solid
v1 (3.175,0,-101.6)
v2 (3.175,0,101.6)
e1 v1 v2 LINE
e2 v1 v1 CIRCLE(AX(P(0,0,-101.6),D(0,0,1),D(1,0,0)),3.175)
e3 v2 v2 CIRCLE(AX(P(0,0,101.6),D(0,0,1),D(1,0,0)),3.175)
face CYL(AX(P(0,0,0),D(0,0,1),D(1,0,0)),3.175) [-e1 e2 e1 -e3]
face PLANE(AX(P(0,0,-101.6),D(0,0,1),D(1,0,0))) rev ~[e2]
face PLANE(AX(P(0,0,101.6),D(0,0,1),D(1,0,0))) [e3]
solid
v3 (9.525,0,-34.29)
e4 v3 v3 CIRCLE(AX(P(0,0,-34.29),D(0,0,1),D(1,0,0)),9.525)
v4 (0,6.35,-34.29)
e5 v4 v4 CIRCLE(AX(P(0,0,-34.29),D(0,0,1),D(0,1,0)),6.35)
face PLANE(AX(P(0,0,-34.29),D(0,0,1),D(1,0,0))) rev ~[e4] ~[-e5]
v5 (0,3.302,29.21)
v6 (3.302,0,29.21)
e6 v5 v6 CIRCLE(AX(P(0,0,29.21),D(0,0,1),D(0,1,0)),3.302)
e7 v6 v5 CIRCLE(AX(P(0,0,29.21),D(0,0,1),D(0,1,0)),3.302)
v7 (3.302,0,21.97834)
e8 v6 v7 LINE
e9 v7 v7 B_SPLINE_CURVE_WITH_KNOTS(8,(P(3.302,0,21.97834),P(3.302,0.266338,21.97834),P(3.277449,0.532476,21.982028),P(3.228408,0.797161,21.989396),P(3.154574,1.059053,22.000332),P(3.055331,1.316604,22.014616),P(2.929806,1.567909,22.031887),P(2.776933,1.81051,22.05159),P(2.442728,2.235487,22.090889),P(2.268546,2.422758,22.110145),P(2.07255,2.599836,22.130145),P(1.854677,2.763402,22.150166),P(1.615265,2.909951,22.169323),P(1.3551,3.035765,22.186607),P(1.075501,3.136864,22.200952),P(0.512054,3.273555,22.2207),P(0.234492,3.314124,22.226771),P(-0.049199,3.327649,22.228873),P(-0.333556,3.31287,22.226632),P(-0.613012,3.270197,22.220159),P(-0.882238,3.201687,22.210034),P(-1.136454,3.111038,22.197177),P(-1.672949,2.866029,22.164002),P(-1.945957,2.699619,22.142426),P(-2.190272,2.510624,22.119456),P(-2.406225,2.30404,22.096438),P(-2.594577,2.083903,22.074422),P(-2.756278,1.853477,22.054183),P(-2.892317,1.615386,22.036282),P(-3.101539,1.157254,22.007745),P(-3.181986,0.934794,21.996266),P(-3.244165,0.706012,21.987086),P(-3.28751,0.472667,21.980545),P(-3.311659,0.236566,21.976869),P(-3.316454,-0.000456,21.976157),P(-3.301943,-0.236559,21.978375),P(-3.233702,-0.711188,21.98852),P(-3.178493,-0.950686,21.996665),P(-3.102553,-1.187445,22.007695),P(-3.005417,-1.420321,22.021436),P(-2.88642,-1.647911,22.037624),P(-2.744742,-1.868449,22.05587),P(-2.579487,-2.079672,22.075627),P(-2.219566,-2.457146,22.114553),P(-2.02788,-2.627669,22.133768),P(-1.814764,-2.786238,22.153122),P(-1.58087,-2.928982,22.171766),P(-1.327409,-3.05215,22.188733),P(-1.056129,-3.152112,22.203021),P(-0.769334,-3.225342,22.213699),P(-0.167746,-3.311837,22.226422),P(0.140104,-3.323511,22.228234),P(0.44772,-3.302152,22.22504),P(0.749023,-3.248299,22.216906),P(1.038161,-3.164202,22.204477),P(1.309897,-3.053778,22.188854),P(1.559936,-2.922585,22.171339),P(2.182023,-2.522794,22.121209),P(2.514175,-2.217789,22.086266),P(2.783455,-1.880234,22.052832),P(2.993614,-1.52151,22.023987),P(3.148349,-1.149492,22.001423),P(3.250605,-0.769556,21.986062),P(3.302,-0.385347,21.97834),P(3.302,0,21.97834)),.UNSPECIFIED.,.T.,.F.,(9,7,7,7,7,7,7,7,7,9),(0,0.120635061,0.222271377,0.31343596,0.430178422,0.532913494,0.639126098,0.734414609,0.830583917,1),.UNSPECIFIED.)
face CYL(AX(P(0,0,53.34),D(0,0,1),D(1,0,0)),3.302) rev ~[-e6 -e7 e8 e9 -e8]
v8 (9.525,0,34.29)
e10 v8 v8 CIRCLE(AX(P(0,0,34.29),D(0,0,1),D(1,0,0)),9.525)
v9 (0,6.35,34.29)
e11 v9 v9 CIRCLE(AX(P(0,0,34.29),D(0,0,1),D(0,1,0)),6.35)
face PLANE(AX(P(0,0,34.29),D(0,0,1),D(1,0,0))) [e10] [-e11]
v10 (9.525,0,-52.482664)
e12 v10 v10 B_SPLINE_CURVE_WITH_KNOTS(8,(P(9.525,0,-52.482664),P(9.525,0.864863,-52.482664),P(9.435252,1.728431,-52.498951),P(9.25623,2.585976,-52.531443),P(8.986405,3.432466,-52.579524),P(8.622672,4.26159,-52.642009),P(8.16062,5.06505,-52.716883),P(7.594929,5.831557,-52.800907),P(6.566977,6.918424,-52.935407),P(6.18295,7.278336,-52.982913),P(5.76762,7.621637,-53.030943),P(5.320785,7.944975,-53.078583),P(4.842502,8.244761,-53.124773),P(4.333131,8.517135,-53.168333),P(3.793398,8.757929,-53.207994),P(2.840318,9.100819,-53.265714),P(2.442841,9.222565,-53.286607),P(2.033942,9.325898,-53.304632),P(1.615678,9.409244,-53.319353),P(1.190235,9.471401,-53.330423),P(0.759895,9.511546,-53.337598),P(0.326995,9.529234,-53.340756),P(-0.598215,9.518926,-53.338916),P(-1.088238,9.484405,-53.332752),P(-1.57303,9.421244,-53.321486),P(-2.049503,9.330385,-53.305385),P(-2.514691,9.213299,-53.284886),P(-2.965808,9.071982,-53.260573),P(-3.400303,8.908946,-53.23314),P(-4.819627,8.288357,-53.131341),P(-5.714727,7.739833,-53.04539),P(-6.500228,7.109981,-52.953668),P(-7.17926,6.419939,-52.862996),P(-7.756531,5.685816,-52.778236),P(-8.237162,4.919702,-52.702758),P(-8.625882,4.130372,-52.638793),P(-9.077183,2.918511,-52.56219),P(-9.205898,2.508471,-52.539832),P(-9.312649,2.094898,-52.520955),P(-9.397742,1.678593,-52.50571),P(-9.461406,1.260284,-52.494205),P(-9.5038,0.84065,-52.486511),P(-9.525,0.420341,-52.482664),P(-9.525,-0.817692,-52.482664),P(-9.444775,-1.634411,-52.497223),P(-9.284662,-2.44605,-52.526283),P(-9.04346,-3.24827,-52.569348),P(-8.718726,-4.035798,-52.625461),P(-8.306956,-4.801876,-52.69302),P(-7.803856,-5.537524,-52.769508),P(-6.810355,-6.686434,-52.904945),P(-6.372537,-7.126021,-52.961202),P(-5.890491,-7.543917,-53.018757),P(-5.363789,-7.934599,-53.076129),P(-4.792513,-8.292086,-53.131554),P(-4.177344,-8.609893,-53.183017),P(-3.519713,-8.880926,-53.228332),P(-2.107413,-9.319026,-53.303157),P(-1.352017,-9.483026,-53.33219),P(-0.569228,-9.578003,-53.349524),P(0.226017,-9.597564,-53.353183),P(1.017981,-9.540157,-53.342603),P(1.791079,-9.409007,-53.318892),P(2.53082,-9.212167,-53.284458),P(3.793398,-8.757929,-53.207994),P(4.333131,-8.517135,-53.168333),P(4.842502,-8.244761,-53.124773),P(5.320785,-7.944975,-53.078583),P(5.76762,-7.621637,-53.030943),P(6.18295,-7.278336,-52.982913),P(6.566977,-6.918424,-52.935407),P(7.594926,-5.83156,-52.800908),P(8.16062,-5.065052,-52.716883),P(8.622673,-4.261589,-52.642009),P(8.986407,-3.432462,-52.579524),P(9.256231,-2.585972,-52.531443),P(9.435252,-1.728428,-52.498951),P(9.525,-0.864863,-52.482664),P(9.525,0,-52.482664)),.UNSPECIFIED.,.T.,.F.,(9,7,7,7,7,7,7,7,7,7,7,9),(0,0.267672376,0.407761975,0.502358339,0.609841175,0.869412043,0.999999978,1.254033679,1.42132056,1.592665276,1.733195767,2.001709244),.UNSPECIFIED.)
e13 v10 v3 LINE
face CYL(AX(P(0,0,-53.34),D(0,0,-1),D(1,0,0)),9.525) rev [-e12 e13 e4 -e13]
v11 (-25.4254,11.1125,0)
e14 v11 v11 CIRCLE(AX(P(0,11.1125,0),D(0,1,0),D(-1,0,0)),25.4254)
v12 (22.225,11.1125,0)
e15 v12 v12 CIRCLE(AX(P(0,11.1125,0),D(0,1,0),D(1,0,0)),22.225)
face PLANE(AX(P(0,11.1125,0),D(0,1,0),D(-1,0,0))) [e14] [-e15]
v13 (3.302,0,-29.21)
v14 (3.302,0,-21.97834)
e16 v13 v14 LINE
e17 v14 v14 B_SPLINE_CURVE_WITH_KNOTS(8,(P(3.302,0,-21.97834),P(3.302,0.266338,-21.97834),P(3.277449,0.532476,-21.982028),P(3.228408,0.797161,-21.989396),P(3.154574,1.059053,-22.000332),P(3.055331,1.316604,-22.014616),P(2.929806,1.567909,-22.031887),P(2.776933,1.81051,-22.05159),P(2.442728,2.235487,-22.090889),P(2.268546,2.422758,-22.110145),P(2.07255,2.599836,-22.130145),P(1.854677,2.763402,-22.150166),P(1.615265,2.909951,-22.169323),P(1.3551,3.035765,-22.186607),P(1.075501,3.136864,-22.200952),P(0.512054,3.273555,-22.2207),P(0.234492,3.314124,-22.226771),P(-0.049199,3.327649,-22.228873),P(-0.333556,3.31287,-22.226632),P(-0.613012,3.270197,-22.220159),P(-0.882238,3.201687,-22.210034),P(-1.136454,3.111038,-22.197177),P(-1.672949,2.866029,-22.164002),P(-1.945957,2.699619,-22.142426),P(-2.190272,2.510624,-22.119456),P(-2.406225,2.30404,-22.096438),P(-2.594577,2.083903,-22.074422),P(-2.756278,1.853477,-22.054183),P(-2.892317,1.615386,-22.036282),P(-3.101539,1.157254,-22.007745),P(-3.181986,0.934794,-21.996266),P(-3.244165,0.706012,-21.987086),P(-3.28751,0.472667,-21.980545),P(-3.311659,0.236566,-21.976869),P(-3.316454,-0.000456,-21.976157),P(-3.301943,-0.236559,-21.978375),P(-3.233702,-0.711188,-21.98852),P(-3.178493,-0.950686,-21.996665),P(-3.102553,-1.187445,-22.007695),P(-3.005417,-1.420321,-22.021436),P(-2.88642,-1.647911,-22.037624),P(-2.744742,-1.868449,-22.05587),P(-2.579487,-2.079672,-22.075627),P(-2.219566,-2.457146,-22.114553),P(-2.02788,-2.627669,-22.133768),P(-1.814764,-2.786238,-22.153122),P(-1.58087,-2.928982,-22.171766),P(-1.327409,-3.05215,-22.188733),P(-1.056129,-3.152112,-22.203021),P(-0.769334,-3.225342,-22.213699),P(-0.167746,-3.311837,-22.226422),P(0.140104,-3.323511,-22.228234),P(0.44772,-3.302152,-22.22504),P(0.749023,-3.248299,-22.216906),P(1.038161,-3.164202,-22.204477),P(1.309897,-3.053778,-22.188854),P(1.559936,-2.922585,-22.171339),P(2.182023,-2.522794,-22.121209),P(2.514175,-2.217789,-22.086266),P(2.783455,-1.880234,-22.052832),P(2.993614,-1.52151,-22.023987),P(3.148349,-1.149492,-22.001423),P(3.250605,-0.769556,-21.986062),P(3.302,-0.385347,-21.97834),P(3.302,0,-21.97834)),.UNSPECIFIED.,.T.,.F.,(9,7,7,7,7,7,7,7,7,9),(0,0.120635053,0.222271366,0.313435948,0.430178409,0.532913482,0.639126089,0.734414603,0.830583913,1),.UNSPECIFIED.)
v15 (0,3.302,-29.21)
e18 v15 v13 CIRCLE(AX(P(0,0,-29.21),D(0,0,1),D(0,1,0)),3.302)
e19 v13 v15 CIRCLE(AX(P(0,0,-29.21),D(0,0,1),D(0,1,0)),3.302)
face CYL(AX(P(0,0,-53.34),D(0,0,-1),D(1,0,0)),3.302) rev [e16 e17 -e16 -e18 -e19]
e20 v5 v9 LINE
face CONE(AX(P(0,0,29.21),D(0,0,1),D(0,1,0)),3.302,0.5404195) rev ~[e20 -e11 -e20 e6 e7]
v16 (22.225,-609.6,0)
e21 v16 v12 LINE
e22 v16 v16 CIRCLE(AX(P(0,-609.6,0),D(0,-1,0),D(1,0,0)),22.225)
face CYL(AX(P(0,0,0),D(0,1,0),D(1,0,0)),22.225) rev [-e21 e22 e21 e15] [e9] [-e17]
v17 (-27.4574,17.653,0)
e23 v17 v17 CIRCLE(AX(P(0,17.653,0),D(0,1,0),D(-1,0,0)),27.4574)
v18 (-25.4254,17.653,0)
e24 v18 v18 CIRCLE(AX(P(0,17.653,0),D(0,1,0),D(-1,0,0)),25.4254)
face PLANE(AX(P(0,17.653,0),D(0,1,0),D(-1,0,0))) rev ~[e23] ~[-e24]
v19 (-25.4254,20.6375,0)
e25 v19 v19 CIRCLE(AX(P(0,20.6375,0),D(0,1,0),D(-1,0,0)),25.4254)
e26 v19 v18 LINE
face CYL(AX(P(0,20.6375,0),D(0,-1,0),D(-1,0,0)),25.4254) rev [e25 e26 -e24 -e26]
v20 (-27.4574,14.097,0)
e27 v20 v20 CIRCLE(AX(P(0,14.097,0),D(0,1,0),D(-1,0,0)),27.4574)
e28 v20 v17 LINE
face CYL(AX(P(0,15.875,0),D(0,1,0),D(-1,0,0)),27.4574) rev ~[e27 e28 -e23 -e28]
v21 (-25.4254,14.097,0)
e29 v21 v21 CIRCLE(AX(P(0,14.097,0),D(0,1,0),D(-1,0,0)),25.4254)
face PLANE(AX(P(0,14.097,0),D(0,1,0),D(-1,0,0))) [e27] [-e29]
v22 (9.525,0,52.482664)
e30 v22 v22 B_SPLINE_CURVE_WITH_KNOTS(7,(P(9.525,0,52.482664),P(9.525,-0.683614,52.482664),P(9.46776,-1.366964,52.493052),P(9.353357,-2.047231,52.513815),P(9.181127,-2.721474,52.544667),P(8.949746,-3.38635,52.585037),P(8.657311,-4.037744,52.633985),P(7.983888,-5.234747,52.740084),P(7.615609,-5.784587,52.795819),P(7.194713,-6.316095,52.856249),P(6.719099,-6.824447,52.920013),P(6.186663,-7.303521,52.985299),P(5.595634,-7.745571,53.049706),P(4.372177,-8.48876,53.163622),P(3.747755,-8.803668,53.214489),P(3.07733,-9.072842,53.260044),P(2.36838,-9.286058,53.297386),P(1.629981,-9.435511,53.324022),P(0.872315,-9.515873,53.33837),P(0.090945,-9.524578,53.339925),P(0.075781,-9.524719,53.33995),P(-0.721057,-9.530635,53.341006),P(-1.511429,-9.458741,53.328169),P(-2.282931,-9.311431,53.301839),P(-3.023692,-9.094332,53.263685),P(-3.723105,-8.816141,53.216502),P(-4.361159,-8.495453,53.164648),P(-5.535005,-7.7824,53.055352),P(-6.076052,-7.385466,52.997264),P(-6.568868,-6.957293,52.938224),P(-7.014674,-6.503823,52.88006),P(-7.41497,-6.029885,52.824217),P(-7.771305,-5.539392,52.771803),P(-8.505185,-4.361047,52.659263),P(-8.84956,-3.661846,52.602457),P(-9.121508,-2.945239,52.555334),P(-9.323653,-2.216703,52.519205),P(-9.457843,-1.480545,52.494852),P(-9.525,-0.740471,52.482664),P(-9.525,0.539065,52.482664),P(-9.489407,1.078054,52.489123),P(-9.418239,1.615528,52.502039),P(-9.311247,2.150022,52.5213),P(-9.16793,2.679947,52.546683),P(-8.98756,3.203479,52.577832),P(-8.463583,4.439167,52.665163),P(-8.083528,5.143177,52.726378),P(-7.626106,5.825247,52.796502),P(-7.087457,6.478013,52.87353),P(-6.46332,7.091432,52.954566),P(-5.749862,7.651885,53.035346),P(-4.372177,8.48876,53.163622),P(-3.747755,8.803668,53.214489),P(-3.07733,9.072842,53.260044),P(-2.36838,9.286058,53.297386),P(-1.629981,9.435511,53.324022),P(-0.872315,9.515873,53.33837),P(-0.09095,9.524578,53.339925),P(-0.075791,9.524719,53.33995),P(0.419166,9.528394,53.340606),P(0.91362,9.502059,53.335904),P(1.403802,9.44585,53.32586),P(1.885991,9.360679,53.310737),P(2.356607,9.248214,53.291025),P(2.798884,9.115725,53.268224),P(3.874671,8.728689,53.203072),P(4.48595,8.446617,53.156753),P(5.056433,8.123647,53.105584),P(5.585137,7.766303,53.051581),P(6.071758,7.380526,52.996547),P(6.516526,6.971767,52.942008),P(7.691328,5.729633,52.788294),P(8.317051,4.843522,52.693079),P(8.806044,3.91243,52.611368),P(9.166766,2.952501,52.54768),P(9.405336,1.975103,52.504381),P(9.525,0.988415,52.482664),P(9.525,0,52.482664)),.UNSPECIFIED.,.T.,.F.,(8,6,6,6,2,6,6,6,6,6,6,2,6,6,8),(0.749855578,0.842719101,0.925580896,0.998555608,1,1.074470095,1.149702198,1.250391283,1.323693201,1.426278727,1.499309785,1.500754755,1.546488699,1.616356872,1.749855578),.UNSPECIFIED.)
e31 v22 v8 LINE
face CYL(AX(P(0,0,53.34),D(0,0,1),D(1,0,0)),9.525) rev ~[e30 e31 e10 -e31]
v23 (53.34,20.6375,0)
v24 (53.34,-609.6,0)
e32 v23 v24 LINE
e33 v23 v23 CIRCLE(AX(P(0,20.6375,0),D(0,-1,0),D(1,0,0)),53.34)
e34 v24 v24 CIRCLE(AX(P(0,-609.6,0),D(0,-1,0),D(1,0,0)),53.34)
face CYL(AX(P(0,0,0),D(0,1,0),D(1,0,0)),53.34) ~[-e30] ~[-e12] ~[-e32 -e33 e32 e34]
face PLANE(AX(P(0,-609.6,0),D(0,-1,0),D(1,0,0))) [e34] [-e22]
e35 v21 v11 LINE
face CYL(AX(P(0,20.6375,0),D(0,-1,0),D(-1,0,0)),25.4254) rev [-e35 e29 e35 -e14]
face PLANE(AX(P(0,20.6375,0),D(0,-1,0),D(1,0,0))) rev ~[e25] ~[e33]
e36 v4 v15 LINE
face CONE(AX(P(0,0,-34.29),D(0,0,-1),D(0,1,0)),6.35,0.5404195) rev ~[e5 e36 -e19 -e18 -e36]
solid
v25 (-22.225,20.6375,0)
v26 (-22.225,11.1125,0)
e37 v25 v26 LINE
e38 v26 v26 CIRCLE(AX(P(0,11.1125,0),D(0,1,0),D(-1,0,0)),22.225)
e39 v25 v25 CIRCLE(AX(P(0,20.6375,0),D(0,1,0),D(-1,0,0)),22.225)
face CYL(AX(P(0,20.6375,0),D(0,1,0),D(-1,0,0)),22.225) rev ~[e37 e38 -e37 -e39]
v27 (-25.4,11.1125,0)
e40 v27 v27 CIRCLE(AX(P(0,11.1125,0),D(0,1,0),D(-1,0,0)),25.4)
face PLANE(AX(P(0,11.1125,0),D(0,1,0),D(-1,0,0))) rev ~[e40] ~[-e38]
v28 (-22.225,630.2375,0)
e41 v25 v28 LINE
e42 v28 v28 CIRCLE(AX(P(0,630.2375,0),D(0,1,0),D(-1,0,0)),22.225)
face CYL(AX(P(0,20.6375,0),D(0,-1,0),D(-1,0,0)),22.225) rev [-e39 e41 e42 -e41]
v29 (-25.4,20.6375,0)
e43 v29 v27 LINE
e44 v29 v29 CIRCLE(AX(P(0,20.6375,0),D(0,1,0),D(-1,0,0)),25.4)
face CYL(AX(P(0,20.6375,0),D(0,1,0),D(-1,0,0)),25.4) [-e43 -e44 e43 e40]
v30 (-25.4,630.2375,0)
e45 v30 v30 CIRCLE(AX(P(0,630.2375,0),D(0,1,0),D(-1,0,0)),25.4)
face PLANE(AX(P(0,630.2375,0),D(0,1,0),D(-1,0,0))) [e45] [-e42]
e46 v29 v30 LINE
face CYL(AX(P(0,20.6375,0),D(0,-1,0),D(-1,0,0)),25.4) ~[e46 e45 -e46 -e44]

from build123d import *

# Parameters (mm, degrees)
F0_R      = 53.34
F0_R_2    = 22.225
F1_DEPTH  = 20.6375
F6_DEPTH  = 609.6
F5_R      = 9.525
F5_R_2    = 3.302
F7_DEPTH  = 19.05
F8_DEPTH  = 32.3616602869
F4_R      = 9.525
F4_R_2    = 3.302
F9_DEPTH  = 19.05
F10_DEPTH = 32.3616602869
F13_W     = 2.032
F13_H     = 3.556
F15_R     = 3.175
F16_DEPTH = 101.6
F19_R     = 25.4
F19_R_2   = 22.225
F20_DEPTH = 9.525
F21_DEPTH = 609.6


# Not quite as in the source:
# - the program builds the solid bodies; features that only make, move or delete a surface that nothing else refers to are left out


with BuildPart() as f1:
    # F0 (on Front) → F1 (new body)
    with BuildSketch(Plane.XZ):
        Circle(F0_R)
        Circle(F0_R_2, mode=Mode.SUBTRACT)
    extrude(amount=-F1_DEPTH)

    # F0 (on Front) → F6 (join)
    with BuildSketch(Plane.XZ):
        Circle(F0_R)
        Circle(F0_R_2, mode=Mode.SUBTRACT)
    extrude(amount=F6_DEPTH)

    # F5 (on offset) → F7 (cut)
    with BuildSketch(Plane.XY.offset(-53.34)):
        Circle(F5_R)
        Circle(F5_R_2, mode=Mode.SUBTRACT)
        Circle(F5_R_2)
    extrude(amount=F7_DEPTH, mode=Mode.SUBTRACT)

    # F5 (on offset) → F8 (cut, up to face)
    with BuildSketch(Plane.XY.offset(-53.34)):
        Circle(F5_R_2)
    extrude(amount=F8_DEPTH, mode=Mode.SUBTRACT)

    # F4 (on offset) → F9 (cut)
    with BuildSketch(Plane.XY.offset(53.34)):
        Circle(F4_R)
        Circle(F4_R_2, mode=Mode.SUBTRACT)
        Circle(F4_R_2)
    extrude(amount=-F9_DEPTH, mode=Mode.SUBTRACT)

    # F4 (on offset) → F10 (cut, up to face)
    with BuildSketch(Plane.XY.offset(53.34)):
        Circle(F4_R_2)
    extrude(amount=-F10_DEPTH, mode=Mode.SUBTRACT)

    # F11 (on Right) → F12 (revolve, cut)
    with BuildSketch(Plane.YZ):
        Polygon((6.35, 34.29), (3.302, 34.29), (3.302, 29.21), align=None)
        Polygon((3.302, -29.21), (3.302, -34.29), (6.35, -34.29), align=None)
    revolve(axis=Axis((0, 0, 6.9711627439), (0, 0, 1)), mode=Mode.SUBTRACT)

    # F13 (on Top) → F14 (revolve, cut)
    with BuildSketch(Plane.XY):
        Polygon((-25.4254, 11.1125), (-22.225, 11.1125), (-22.225, 20.6375), (-25.4254, 20.6375), (-25.4254, 17.653), (-25.4254, 14.097), align=None)
        with Locations((-26.4414, 15.875)):
            Rectangle(F13_W, F13_H)
    revolve(axis=Axis((0, 5.55625, 0), (0, 1, 0)), mode=Mode.SUBTRACT)


with BuildPart() as f16:
    # F15 (on Top) → F16 (new body, symmetric)
    with BuildSketch(Plane.XY):
        Circle(F15_R)
    extrude(amount=F16_DEPTH, both=True)


with BuildPart() as f20:
    # F19 (on face) → F20 (new body)
    with BuildSketch(Plane(origin=(0, 20.6375, 0), x_dir=(-1, 0, 0), z_dir=(0, 1, 0))):
        Circle(F19_R)
        Circle(F19_R_2, mode=Mode.SUBTRACT)
    extrude(amount=-F20_DEPTH)

    # F21 (add): a face of the model
    f21_faces = [f20.faces().sort_by_distance(p)[0] for p in [
        (24.6815795103, 20.6375, 0),
    ]]
    extrude(f21_faces, amount=F21_DEPTH)


solid = Compound([f1.part, f16.part, f20.part])
